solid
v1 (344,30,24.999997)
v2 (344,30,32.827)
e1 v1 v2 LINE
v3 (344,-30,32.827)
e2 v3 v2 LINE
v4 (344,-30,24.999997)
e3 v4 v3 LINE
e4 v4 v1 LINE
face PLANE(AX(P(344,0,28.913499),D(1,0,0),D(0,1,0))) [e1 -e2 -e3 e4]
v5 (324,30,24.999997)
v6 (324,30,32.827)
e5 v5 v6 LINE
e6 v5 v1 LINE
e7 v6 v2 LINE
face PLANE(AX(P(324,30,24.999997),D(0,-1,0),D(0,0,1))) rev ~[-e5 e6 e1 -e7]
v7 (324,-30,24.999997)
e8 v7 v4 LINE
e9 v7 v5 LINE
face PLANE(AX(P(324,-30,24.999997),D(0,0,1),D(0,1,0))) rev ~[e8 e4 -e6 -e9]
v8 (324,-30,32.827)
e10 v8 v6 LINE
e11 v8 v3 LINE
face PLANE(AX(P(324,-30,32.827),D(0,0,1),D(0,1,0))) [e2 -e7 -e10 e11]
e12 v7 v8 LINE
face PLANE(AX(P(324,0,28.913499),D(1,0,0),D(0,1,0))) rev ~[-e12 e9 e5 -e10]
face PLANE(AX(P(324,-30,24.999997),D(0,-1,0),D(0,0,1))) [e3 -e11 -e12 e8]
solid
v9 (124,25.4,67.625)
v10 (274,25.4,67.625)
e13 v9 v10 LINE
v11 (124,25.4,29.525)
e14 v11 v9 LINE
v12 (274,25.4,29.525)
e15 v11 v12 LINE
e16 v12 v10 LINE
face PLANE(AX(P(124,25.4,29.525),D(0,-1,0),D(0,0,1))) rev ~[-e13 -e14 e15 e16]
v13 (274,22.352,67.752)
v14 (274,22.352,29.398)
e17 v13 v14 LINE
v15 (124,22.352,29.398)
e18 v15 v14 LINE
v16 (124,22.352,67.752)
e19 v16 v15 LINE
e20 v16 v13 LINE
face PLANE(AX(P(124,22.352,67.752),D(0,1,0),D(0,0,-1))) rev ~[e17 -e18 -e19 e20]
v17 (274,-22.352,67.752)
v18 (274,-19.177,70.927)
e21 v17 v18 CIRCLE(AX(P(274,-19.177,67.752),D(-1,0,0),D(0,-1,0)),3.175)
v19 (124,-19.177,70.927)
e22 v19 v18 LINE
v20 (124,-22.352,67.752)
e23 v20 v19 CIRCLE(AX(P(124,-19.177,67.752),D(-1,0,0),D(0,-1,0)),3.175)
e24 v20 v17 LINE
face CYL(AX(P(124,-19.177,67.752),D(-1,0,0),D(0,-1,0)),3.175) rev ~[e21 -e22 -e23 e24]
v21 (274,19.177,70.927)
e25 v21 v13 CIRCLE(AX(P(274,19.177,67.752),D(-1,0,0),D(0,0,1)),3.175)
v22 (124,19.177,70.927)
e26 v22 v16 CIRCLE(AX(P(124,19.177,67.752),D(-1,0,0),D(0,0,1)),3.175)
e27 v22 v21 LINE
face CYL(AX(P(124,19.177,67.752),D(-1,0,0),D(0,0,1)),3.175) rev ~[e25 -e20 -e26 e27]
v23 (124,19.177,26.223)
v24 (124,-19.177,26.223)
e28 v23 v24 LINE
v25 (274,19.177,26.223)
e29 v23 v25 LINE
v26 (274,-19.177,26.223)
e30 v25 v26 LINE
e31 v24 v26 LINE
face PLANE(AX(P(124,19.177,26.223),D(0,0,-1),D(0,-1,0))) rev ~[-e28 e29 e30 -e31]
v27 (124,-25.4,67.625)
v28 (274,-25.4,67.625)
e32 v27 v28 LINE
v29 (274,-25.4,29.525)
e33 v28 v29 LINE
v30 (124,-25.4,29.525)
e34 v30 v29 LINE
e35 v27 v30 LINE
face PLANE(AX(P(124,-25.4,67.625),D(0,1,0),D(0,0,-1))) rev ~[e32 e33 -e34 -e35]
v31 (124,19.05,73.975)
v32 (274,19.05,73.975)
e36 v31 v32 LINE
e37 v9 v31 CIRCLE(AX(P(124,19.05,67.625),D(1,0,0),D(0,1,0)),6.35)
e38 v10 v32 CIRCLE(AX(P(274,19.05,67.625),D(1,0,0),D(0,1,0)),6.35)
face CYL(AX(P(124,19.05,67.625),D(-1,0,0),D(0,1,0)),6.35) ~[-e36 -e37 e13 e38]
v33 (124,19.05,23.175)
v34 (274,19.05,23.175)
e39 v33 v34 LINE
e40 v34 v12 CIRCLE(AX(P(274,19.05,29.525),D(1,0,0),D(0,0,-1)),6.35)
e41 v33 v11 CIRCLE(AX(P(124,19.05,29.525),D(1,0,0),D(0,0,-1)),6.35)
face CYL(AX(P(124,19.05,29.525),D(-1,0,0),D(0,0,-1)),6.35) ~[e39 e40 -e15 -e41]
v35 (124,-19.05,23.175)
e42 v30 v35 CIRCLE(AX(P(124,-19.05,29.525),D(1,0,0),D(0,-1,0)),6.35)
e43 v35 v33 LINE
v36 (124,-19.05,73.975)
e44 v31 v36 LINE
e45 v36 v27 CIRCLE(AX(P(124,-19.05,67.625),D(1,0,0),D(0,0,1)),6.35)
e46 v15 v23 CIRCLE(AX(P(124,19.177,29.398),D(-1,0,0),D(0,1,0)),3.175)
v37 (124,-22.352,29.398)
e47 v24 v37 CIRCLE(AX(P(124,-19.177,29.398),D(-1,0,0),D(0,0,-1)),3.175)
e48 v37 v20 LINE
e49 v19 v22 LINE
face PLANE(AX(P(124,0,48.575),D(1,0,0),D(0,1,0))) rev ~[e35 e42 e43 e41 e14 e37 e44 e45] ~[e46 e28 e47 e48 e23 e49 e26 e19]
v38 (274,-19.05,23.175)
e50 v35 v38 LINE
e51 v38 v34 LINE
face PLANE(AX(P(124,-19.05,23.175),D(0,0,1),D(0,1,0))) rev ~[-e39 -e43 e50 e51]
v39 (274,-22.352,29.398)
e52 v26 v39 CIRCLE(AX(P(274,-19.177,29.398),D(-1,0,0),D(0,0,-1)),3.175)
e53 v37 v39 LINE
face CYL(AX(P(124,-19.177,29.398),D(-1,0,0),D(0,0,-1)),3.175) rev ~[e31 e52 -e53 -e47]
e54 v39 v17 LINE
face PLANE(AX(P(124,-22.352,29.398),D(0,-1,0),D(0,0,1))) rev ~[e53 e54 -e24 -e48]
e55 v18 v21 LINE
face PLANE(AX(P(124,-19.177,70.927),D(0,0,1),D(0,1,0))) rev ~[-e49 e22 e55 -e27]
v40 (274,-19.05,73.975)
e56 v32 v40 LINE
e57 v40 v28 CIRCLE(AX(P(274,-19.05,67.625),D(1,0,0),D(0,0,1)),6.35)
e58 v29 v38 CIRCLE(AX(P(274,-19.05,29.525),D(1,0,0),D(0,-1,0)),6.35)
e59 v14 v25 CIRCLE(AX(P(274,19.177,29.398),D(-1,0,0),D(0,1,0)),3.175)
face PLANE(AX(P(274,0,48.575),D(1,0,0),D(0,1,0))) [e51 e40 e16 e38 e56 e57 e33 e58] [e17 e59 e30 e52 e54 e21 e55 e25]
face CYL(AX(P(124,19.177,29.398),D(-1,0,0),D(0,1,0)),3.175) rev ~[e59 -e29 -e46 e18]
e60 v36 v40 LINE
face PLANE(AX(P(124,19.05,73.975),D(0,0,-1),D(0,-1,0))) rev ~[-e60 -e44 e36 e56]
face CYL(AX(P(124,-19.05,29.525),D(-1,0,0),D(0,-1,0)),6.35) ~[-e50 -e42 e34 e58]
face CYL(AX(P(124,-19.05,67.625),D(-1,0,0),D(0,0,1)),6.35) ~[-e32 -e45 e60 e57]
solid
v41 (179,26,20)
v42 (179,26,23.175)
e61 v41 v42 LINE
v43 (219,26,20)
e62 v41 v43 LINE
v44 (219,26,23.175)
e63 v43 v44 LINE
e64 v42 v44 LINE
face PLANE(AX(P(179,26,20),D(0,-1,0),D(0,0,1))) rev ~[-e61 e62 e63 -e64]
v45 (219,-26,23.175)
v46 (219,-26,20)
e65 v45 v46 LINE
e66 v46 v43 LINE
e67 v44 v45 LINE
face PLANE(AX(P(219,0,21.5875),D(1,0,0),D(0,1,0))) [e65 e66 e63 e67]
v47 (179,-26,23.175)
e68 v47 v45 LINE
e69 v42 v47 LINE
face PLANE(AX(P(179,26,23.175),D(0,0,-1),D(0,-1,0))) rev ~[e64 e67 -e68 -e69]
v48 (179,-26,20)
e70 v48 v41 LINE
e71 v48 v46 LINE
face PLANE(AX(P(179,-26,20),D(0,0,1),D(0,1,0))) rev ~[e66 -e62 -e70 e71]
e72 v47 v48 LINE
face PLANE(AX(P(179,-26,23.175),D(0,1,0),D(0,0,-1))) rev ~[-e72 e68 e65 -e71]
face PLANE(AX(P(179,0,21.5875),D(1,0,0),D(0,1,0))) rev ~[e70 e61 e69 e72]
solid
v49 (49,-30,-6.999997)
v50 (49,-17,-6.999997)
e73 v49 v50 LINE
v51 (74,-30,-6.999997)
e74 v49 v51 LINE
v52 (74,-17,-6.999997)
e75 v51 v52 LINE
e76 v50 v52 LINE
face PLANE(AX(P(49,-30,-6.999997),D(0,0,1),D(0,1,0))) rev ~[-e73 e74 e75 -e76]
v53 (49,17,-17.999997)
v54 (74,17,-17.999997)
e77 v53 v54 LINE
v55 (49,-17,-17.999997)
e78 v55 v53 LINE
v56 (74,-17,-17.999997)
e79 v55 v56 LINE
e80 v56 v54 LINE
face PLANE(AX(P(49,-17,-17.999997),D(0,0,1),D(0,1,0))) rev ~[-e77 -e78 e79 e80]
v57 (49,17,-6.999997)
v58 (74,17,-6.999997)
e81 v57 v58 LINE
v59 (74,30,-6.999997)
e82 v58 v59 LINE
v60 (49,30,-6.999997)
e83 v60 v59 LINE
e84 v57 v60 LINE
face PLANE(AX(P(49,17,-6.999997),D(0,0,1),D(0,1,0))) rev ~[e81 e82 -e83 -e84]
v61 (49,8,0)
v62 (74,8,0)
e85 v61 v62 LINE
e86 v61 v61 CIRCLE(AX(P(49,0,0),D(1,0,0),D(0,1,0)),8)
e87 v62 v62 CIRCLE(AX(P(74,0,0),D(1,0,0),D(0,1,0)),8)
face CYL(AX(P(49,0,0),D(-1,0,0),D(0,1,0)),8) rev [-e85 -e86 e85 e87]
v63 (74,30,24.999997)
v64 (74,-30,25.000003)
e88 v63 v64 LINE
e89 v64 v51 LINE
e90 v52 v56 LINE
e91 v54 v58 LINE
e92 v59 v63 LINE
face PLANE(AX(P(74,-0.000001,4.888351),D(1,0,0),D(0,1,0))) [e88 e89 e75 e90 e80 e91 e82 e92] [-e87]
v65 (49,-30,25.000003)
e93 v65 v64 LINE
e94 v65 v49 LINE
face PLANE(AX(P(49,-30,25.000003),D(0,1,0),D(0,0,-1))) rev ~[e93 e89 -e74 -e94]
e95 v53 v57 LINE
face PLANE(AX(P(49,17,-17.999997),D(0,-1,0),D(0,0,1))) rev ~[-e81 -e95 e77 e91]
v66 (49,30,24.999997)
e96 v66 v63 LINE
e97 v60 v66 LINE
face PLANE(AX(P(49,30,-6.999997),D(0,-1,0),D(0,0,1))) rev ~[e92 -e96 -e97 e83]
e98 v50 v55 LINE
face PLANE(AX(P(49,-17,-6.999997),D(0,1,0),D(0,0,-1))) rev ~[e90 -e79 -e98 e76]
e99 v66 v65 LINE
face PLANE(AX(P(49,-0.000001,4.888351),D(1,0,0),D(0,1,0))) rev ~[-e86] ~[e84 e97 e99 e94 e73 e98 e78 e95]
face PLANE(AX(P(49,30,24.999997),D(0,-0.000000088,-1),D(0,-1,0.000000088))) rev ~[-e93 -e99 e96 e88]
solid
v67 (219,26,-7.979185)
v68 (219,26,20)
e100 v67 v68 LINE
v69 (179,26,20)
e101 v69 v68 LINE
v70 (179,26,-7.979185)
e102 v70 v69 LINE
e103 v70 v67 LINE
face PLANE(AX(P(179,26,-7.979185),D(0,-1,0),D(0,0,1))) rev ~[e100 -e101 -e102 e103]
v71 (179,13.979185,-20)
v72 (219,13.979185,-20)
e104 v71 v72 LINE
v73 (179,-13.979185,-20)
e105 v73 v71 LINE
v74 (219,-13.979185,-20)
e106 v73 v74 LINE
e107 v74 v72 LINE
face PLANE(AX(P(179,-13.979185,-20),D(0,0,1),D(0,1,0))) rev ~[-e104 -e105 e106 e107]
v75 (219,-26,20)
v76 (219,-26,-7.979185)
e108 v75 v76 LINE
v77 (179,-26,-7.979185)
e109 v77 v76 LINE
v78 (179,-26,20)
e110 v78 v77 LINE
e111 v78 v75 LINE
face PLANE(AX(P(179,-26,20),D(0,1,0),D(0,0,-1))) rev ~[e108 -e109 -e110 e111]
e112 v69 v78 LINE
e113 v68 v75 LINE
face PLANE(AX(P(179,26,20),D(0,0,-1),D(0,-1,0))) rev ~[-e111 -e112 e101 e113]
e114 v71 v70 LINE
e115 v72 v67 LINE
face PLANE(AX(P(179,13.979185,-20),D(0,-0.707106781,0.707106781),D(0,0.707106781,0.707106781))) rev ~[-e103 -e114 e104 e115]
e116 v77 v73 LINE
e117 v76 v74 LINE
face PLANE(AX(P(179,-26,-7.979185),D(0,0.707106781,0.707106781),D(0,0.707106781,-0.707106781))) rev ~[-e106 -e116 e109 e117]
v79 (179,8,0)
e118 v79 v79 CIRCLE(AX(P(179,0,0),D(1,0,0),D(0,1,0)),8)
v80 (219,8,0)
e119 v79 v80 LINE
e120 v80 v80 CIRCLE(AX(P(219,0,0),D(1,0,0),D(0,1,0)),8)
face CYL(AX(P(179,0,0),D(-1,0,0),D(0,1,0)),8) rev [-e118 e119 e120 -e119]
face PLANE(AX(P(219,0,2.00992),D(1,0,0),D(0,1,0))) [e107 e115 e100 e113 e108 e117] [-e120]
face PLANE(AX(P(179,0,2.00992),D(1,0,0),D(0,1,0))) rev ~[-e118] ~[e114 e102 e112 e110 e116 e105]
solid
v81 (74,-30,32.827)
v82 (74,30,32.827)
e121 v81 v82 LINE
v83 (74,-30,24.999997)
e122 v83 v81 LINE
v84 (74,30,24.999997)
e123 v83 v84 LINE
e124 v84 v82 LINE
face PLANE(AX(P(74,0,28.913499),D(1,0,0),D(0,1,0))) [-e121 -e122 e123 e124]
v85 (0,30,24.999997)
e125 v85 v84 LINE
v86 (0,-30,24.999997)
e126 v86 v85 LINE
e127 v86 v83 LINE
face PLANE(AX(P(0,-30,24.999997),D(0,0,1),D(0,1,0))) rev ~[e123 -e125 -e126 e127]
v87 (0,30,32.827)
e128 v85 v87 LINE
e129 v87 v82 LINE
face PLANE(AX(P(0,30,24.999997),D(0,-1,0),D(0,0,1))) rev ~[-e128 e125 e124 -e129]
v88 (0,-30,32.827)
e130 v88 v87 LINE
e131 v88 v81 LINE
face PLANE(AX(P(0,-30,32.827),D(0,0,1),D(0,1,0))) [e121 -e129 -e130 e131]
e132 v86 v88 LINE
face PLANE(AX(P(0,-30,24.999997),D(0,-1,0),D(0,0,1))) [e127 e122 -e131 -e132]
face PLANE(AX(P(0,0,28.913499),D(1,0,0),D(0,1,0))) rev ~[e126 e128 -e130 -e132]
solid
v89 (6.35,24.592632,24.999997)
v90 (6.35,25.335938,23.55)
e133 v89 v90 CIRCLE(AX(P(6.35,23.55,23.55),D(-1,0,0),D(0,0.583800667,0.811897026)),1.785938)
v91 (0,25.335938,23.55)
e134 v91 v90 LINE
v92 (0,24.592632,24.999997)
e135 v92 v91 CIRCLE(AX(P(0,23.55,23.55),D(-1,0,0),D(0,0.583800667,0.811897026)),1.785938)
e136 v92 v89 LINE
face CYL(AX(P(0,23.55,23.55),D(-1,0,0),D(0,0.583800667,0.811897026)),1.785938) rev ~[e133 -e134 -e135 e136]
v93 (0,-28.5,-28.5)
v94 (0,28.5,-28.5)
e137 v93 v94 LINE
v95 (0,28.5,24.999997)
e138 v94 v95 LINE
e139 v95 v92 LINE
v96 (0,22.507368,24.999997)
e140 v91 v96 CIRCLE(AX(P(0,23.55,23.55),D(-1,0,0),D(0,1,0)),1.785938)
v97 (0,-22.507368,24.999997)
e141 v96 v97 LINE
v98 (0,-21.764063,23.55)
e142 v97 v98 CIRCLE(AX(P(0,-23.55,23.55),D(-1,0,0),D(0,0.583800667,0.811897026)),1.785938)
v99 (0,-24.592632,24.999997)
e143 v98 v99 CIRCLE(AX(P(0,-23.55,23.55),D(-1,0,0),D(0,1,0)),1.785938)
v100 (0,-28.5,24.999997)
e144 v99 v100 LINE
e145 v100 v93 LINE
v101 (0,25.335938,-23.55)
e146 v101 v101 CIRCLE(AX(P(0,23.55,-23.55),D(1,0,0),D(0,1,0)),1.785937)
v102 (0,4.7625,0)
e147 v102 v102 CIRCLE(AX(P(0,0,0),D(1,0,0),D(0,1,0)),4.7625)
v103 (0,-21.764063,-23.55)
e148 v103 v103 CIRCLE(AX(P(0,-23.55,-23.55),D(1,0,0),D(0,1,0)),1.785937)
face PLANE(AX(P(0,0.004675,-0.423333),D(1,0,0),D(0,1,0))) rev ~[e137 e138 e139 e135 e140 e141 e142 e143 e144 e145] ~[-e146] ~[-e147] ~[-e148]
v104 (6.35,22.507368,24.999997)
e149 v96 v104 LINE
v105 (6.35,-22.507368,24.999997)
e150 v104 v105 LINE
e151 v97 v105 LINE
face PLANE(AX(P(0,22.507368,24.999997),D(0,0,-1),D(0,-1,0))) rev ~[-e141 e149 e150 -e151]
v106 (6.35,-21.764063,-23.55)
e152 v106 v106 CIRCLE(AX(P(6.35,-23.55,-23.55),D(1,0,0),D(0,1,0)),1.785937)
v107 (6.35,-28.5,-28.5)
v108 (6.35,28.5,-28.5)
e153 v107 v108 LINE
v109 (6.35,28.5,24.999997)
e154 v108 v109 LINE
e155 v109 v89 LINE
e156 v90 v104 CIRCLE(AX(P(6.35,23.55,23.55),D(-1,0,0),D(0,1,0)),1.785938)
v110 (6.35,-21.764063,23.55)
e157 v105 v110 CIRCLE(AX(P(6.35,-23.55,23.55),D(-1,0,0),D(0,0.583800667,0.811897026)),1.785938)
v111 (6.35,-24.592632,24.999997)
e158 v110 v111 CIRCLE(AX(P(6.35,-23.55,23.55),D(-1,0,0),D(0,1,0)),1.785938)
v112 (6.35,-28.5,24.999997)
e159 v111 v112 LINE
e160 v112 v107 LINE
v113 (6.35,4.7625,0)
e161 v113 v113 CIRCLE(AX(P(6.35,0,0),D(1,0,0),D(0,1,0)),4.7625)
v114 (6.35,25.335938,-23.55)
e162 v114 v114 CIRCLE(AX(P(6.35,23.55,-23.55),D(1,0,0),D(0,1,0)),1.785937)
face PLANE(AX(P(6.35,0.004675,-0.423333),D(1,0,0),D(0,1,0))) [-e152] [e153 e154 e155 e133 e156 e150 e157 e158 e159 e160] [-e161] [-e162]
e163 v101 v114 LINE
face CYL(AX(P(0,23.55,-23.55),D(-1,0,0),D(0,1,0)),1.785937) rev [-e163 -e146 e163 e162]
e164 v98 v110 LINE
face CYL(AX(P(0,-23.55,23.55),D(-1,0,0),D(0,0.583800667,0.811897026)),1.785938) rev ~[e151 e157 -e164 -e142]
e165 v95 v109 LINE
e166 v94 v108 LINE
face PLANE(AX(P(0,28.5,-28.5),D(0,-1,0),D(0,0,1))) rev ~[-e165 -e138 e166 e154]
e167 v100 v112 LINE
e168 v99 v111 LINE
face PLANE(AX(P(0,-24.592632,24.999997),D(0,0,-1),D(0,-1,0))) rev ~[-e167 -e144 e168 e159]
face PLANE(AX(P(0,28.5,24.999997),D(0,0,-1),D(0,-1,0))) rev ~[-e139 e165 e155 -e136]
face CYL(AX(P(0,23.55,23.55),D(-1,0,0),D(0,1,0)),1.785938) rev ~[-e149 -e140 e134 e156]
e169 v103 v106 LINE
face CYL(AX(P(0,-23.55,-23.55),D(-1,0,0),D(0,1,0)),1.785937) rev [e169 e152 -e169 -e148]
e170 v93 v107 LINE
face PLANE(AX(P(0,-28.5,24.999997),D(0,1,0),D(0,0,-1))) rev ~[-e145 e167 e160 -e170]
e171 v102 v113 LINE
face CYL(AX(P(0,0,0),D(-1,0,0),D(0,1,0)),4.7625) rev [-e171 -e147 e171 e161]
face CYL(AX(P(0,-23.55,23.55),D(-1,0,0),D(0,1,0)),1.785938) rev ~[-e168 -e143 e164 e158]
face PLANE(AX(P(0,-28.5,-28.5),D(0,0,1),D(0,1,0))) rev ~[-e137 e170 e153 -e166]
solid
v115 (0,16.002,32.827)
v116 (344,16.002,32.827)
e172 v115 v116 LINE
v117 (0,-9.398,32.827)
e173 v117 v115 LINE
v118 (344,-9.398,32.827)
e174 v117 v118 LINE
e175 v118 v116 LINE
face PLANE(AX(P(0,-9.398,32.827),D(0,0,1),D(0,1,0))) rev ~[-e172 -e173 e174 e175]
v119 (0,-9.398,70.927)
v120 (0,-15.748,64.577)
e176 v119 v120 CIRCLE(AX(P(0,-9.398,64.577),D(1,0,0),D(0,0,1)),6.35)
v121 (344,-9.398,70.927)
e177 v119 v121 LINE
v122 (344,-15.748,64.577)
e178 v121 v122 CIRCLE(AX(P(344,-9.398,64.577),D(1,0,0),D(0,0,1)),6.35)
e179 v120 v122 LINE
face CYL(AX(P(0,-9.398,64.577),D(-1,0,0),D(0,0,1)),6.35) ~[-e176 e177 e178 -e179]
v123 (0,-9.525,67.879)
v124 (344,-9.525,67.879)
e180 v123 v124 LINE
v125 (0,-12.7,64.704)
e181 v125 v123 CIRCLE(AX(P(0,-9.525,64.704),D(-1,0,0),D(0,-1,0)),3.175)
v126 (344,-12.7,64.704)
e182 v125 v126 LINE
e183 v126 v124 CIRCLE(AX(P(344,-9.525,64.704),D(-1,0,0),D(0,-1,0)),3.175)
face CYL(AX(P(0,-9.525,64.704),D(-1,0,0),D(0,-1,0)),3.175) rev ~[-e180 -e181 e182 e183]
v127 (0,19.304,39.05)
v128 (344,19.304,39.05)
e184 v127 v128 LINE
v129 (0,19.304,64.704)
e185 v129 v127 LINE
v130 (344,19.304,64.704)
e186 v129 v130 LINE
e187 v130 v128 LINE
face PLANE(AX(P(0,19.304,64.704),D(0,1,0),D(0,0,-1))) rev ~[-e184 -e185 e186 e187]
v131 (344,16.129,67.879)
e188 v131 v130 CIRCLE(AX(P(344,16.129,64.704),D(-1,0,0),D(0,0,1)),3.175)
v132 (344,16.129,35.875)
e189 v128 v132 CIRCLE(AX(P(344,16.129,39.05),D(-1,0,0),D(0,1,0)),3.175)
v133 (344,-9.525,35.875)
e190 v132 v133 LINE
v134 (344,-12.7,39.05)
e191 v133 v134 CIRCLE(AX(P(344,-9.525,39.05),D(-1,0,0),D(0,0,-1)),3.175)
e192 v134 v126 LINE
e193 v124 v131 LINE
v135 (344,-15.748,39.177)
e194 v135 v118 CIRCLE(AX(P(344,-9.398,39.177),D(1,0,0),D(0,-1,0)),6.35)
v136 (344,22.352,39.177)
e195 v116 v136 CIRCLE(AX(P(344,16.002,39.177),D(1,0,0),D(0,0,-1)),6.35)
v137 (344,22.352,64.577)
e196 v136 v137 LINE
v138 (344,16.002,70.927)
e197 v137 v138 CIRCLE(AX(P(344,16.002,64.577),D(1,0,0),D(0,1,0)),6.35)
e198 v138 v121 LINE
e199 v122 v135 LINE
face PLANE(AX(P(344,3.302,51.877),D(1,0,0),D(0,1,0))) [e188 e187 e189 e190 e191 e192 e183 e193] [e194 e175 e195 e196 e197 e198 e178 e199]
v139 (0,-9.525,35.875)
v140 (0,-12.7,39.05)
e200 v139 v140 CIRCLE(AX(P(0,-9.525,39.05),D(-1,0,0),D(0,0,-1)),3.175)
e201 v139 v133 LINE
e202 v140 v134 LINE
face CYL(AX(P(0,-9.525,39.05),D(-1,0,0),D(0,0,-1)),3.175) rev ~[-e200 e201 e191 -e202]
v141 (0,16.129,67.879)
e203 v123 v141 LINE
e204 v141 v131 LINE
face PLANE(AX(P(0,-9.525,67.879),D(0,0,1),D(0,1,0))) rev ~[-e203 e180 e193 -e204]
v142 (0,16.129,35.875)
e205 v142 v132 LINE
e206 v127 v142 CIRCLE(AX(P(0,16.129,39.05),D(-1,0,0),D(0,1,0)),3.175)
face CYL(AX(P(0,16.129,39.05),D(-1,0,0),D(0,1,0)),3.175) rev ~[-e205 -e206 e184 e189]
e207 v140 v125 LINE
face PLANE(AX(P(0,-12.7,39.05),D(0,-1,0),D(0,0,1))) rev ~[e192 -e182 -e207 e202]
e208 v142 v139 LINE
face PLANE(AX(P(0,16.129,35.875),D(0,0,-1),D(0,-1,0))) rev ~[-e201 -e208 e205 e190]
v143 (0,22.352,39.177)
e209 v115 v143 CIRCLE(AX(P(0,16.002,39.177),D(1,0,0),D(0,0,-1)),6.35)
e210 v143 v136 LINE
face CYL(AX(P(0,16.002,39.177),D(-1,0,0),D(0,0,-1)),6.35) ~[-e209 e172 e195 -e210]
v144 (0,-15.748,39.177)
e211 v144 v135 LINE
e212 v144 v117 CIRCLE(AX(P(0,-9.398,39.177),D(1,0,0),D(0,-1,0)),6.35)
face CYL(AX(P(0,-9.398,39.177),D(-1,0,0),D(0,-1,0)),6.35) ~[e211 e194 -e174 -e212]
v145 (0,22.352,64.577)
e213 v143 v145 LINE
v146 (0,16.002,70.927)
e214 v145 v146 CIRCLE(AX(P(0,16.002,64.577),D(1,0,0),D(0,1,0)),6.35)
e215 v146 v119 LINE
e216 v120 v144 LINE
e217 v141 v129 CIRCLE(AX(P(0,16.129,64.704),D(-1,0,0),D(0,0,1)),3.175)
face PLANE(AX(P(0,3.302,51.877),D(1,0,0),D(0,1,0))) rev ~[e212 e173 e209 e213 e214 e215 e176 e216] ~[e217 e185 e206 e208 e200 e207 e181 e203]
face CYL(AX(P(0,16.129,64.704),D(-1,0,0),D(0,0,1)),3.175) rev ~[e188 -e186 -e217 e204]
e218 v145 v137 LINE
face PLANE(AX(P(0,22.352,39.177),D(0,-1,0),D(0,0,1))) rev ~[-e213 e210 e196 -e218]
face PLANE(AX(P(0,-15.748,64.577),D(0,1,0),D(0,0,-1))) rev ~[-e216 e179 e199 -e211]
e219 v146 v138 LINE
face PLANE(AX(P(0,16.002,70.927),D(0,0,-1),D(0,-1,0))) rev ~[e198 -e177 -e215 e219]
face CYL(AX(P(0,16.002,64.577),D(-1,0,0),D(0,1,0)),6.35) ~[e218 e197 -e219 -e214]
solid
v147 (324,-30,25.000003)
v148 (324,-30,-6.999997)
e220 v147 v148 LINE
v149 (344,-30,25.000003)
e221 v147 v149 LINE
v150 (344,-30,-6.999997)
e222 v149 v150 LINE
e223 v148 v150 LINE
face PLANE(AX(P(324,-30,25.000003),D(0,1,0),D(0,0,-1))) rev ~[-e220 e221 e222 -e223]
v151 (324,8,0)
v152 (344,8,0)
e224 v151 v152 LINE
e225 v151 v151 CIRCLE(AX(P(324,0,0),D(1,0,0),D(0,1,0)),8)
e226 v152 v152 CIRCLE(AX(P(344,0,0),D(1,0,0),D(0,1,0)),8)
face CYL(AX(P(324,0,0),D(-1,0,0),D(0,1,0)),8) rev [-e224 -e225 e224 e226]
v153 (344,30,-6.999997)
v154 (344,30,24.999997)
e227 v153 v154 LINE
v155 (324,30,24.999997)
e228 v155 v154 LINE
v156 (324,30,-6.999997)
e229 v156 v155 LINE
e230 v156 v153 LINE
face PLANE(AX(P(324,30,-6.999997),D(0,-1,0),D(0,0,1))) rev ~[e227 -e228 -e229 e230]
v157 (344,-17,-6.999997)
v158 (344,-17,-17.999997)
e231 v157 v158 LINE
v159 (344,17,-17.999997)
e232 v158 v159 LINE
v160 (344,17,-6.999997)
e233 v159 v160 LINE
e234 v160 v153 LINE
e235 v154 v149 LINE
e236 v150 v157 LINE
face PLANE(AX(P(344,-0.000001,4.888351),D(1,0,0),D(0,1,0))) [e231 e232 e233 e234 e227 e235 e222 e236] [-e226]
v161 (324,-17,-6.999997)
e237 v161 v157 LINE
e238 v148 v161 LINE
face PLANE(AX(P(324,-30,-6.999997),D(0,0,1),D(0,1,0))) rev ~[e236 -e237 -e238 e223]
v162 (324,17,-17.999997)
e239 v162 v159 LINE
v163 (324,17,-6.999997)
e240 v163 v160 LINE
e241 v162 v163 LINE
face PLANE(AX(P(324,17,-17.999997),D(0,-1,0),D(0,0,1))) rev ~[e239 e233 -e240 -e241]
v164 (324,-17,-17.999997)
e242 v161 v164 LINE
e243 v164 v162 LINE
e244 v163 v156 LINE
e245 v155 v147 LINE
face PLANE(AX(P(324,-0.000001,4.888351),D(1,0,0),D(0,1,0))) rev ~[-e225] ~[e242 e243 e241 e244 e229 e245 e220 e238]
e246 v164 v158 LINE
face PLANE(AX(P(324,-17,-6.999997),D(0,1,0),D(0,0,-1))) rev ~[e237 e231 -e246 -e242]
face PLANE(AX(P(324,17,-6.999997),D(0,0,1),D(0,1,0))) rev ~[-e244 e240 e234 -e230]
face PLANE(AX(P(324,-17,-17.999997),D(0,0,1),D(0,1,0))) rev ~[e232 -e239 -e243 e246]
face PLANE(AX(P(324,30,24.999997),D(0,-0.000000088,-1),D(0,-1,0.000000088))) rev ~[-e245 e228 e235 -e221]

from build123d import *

# Parameters (mm, degrees)
F4_R      = 1.7859375
F4_R_2    = 4.7625
F6_DEPTH  = 6.35
F7_START  = 49
F3_R      = 8
F7_DEPTH  = 25
F8_START  = 124
F8_DEPTH  = 150
F9_DEPTH  = 344
F10_START = 179
F0_R      = 8
F10_DEPTH = 40
F3_W      = 60
F3_H      = 7.8270026548
F11_DEPTH = 74
F12_START = 324
F12_DEPTH = 20
F13_START = 324
F13_DEPTH = 20
F14_START = 179
F14_DEPTH = 40


# Not quite as in the source:
# - ends of sketch curves that miss each other by under 0.0002 mm in the source are joined


with BuildPart() as f6:
    # F4 (on Right) → F6 (new body, through all)
    with BuildSketch(Plane.YZ):
        with BuildLine():
            ThreePointArc((-22.5073684961, 24.9999973452), (-21.9607159701, 24.3647079392), (-21.7640625, 23.55))
            ThreePointArc((-21.7640625, 23.55), (-24.3647079392, 21.9607159701), (-24.5926315039, 24.9999973452))
            Line((-24.5926315039, 24.9999973452), (-28.5, 24.9999973452))
            Line((-28.5, 24.9999973452), (-28.5, -28.5))
            Line((-28.5, -28.5), (28.5, -28.5))
            Line((28.5, -28.5), (28.5, 24.9999973452))
            Line((28.5, 24.9999973452), (24.5926315039, 24.9999973452))
            ThreePointArc((24.5926315039, 24.9999973452), (25.1392840299, 24.3647079392), (25.3359375, 23.55))
            ThreePointArc((25.3359375, 23.55), (22.7352920608, 21.9607159701), (22.5073684961, 24.9999973452))
            Line((22.5073684961, 24.9999973452), (-22.5073684961, 24.9999973452))
        make_face()
        with Locations((-23.55, -23.55)):
            Circle(F4_R, mode=Mode.SUBTRACT)
        with Locations((23.55, -23.55)):
            Circle(F4_R, mode=Mode.SUBTRACT)
        Circle(F4_R_2, mode=Mode.SUBTRACT)
    extrude(amount=F6_DEPTH)


with BuildPart() as f7:
    # F3 (on Right) → F7 (new body)
    with BuildSketch(Plane.YZ.offset(F7_START)):
        Polygon((30, 24.9999973452), (-30, 25.0000026548), (-30, -6.9999973452), (-17, -6.9999973452), (-17, -17.9999973452), (17, -17.9999973452), (17, -6.9999973452), (30, -6.9999973452), align=None)
        Circle(F3_R, mode=Mode.SUBTRACT)
    extrude(amount=F7_DEPTH)


with BuildPart() as f8:
    # F1 (on Right) → F8 (new body)
    with BuildSketch(Plane.YZ.offset(F8_START)):
        with BuildLine():
            ThreePointArc((25.4, 67.625), (23.5401280605, 72.1151280605), (19.05, 73.975))
            Line((19.05, 73.975), (-19.05, 73.975))
            ThreePointArc((-19.05, 73.975), (-23.5401280605, 72.1151280605), (-25.4, 67.625))
            Line((-25.4, 67.625), (-25.4, 29.525))
            ThreePointArc((-25.4, 29.525), (-23.5401280605, 25.0348719395), (-19.05, 23.175))
            Line((-19.05, 23.175), (19.05, 23.175))
            ThreePointArc((19.05, 23.175), (23.5401280605, 25.0348719395), (25.4, 29.525))
            Line((25.4, 29.525), (25.4, 67.625))
        make_face()
        with BuildLine():
            Line((-19.177, 70.927), (19.177, 70.927))
            ThreePointArc((19.177, 70.927), (21.4220640303, 69.9970640303), (22.352, 67.752))
            Line((22.352, 67.752), (22.352, 29.398))
            ThreePointArc((22.352, 29.398), (21.4220640303, 27.1529359697), (19.177, 26.223))
            Line((19.177, 26.223), (-19.177, 26.223))
            ThreePointArc((-19.177, 26.223), (-21.4220640303, 27.1529359697), (-22.352, 29.398))
            Line((-22.352, 29.398), (-22.352, 67.752))
            ThreePointArc((-22.352, 67.752), (-21.4220640303, 69.9970640303), (-19.177, 70.927))
        make_face(mode=Mode.SUBTRACT)
    extrude(amount=F8_DEPTH)


with BuildPart() as f9:
    # F2 (on Right) → F9 (new body, through all)
    with BuildSketch(Plane.YZ):
        with BuildLine():
            ThreePointArc((22.352, 64.577), (20.4921280605, 69.0671280605), (16.002, 70.927))
            Line((16.002, 70.927), (-9.398, 70.927))
            ThreePointArc((-9.398, 70.927), (-13.8881280605, 69.0671280605), (-15.748, 64.577))
            Line((-15.748, 64.577), (-15.748, 39.177))
            ThreePointArc((-15.748, 39.177), (-13.8881280605, 34.6868719395), (-9.398, 32.827))
            Line((-9.398, 32.827), (16.002, 32.827))
            ThreePointArc((16.002, 32.827), (20.4921280605, 34.6868719395), (22.352, 39.177))
            Line((22.352, 39.177), (22.352, 64.577))
        make_face()
        with BuildLine():
            Line((-9.525, 67.879), (16.129, 67.879))
            ThreePointArc((16.129, 67.879), (18.3740640303, 66.9490640303), (19.304, 64.704))
            Line((19.304, 64.704), (19.304, 39.05))
            ThreePointArc((19.304, 39.05), (18.3740640303, 36.8049359697), (16.129, 35.875))
            Line((16.129, 35.875), (-9.525, 35.875))
            ThreePointArc((-9.525, 35.875), (-11.7700640303, 36.8049359697), (-12.7, 39.05))
            Line((-12.7, 39.05), (-12.7, 64.704))
            ThreePointArc((-12.7, 64.704), (-11.7700640303, 66.9490640303), (-9.525, 67.879))
        make_face(mode=Mode.SUBTRACT)
    extrude(amount=F9_DEPTH)


with BuildPart() as f10:
    # F0 (on Right) → F10 (new body)
    with BuildSketch(Plane.YZ.offset(F10_START)):
        Polygon((26, 20), (-26, 20), (-26, -7.9791847198), (-13.9791847198, -20), (13.9791847198, -20), (26, -7.9791847198), align=None)
        Circle(F0_R, mode=Mode.SUBTRACT)
    extrude(amount=F10_DEPTH)


with BuildPart() as f11:
    # F3 (on Right) → F11 (new body, through all)
    with BuildSketch(Plane.YZ):
        with Locations((0, 28.9134986726)):
            Rectangle(F3_W, F3_H)
    extrude(amount=F11_DEPTH)


with BuildPart() as f12:
    # F3 (on Right) → F12 (new body)
    with BuildSketch(Plane.YZ.offset(F12_START)):
        Polygon((30, 24.9999973452), (-30, 25.0000026548), (-30, -6.9999973452), (-17, -6.9999973452), (-17, -17.9999973452), (17, -17.9999973452), (17, -6.9999973452), (30, -6.9999973452), align=None)
        Circle(F3_R, mode=Mode.SUBTRACT)
    extrude(amount=F12_DEPTH)


with BuildPart() as f13:
    # F3 (on Right) → F13 (new body)
    with BuildSketch(Plane.YZ.offset(F13_START)):
        with Locations((0, 28.9134986726)):
            Rectangle(F3_W, F3_H)
    extrude(amount=F13_DEPTH)


with BuildPart() as f14:
    # F1 (on Right) → F14 (new body)
    with BuildSketch(Plane.YZ.offset(F14_START)):
        Polygon((26, 23.175), (19.05, 23.175), (-19.05, 23.175), (-26, 23.175), (-26, 20), (26, 20), align=None)
    extrude(amount=F14_DEPTH)


solid = Compound([f6.part, f7.part, f8.part, f9.part, f10.part, f11.part, f12.part, f13.part, f14.part])
